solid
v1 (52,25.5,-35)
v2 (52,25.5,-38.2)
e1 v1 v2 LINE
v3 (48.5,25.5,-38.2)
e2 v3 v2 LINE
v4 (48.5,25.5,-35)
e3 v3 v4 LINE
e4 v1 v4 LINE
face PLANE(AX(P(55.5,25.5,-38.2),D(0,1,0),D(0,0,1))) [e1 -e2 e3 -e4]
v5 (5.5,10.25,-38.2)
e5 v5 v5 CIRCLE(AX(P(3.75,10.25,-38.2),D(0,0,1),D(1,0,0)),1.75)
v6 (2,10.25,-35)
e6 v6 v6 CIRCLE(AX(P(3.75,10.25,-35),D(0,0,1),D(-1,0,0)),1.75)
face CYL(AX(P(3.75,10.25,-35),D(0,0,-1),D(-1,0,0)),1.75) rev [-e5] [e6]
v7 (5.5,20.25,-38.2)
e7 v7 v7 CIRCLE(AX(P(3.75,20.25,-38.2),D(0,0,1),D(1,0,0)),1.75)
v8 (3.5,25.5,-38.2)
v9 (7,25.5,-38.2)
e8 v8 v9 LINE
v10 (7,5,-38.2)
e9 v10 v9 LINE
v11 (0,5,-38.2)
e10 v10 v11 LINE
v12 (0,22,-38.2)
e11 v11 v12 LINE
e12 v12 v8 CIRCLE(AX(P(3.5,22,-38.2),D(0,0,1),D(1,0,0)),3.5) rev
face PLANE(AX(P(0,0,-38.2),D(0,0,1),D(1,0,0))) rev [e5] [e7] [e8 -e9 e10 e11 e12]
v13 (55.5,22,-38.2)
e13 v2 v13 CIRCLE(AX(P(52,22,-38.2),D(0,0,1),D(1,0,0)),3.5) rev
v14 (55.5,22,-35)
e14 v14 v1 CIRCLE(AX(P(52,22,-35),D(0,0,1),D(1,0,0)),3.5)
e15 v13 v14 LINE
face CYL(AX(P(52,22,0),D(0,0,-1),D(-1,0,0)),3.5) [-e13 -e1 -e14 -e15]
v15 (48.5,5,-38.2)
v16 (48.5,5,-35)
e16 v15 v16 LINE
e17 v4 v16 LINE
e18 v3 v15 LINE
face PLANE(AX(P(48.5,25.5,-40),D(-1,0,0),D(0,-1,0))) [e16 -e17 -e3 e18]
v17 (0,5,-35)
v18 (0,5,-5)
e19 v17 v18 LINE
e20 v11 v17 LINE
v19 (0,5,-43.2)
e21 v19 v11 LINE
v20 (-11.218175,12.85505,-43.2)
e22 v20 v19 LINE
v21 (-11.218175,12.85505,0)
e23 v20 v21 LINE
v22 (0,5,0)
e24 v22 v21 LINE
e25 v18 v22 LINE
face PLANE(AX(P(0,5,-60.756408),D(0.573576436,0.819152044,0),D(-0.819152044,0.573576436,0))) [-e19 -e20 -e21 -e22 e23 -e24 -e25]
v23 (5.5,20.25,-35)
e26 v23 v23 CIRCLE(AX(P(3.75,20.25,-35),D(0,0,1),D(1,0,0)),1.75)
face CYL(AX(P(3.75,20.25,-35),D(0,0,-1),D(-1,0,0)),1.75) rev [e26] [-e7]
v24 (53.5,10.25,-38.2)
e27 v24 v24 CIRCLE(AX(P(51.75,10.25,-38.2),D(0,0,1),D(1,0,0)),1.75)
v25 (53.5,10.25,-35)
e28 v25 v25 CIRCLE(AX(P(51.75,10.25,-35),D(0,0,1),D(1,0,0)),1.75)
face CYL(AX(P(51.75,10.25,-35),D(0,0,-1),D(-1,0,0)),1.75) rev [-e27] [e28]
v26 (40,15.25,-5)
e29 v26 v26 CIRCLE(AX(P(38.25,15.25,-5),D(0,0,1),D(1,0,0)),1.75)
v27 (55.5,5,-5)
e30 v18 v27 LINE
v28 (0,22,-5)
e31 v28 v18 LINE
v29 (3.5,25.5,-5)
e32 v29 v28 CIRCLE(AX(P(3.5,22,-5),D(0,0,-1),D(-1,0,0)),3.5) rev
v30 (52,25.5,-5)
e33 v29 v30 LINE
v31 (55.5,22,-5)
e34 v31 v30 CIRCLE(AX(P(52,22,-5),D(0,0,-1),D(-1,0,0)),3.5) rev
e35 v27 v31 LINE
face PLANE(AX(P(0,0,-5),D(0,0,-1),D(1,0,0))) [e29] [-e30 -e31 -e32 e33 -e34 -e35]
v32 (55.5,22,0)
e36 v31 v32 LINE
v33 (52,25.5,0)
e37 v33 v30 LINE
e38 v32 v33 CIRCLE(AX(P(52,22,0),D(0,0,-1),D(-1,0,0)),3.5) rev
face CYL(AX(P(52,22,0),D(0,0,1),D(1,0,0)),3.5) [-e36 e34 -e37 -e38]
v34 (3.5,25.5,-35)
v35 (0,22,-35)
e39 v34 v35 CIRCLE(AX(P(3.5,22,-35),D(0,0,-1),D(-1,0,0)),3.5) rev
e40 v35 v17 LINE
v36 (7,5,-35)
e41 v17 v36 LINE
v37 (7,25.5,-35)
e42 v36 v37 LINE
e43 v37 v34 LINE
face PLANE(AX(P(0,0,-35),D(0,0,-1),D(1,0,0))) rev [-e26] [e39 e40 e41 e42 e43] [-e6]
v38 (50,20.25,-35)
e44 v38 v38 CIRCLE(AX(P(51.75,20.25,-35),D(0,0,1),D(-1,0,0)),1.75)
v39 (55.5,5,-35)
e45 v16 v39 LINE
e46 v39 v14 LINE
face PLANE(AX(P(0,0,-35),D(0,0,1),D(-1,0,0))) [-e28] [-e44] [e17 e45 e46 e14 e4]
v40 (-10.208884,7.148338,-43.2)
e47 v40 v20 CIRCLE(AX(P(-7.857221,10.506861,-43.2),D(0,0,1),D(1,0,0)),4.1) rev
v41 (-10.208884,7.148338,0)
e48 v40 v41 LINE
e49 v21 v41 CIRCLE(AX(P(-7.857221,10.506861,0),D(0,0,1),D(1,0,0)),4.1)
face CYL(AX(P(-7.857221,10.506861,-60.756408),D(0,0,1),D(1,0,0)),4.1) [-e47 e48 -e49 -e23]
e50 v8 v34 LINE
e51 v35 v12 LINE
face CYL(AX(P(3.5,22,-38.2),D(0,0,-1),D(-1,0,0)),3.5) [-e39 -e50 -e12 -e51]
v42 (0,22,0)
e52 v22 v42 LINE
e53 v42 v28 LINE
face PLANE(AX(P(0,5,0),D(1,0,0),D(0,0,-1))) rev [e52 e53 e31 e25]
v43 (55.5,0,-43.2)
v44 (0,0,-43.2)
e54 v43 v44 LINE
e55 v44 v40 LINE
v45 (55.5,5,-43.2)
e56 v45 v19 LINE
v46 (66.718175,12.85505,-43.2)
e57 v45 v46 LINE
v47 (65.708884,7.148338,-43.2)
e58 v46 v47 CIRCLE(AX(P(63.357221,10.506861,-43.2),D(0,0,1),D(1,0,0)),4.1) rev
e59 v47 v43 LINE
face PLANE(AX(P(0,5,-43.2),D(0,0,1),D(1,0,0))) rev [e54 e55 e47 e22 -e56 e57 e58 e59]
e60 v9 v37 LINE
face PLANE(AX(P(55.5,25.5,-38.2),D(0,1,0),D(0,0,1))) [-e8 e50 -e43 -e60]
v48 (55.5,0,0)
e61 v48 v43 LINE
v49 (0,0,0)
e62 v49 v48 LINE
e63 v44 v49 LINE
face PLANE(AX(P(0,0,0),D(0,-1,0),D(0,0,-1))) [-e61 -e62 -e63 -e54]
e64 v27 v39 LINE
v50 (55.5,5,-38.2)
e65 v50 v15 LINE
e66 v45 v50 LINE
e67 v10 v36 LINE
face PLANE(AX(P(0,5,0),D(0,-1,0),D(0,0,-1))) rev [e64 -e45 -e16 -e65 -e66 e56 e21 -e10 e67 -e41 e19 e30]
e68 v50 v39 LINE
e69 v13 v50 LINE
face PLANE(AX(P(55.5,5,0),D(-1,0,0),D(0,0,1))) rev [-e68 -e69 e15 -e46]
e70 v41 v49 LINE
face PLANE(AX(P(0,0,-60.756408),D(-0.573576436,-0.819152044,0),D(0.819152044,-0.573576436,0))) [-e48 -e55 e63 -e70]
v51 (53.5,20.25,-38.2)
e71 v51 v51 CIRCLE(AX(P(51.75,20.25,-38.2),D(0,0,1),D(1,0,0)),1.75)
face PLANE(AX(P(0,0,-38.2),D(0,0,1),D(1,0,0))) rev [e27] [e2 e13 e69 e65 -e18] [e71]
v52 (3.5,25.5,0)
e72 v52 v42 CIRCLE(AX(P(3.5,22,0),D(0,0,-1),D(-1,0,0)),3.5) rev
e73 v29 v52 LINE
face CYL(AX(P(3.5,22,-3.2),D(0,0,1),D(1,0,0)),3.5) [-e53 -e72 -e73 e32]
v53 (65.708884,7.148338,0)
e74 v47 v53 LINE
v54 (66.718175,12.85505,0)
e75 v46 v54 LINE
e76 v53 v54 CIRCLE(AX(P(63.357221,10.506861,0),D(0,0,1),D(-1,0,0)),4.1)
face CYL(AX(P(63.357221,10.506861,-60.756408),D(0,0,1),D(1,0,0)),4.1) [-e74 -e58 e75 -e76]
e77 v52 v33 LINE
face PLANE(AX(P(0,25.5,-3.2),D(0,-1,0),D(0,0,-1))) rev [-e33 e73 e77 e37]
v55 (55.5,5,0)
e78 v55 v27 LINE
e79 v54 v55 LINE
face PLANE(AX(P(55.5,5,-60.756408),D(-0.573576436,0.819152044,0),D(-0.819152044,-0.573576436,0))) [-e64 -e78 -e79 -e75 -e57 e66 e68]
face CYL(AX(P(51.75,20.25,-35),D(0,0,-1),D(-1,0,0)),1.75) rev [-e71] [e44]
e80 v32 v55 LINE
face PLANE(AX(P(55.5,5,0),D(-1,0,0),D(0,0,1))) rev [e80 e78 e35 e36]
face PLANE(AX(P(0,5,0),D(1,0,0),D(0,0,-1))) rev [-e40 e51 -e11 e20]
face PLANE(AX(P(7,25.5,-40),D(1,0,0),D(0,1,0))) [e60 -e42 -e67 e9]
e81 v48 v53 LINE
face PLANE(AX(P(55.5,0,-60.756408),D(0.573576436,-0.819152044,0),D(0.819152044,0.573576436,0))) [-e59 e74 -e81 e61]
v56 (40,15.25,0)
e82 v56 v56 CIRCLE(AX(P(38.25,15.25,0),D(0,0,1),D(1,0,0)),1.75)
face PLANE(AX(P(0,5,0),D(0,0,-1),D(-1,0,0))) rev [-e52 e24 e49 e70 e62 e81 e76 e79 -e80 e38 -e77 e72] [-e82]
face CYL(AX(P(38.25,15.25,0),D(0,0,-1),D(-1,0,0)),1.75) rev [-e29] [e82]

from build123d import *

# Parameters (mm, degrees)
SKETCH1_W            = 55.5
SKETCH1_H            = 43.2
BASE_DEPTH           = 5
SKETCH2_W            = 55.5
SKETCH2_H            = 25.5
WALL_DEPTH           = 5
SKETCH3_W            = 7
SKETCH3_H            = 20.5
MOUNTINGTABS_DEPTH   = 5
LIPS_REACH           = 76.811
SKETCH5_R            = 1.75
MOUNTINGHOLES_DEPTH  = 5
FILLETS_R            = 3.5
SKETCH6_R            = 1.75
THROUGHHOLE_DEPTH    = 5
MIRROR1_START        = -40
MIRROR1_OUTLINE_R    = 1.75
MIRROR1_DEPTH        = 1.8
MIRROR1_START_2      = -38.2
MIRROR1_2_OUTLINE_R  = 1.75
MIRROR1_2_DEPTH      = 3.2
FILLETS_OF_MIRROR2_R = 3.5
CUT_EXTRUDE2_DEPTH   = 5
CUT_EXTRUDE3_DEPTH   = 3.2


# Read off the part's stored shape, not the designer's step: Mirror1
with BuildPart() as part:
    # Sketch1 → base (new body)
    with BuildSketch(Plane(origin=(0, 0, 0), x_dir=(1, 0, 0), z_dir=(0, 1, 0))):
        with Locations((27.75, 21.6)):
            Rectangle(SKETCH1_W, SKETCH1_H)
    extrude(amount=BASE_DEPTH)

    # Sketch2 → wall (add)
    with BuildSketch(Plane(origin=(0, 0, -43.2), x_dir=(-1, 0, 0), z_dir=(0, 0, -1))):
        with Locations((-27.75, 12.75)):
            Rectangle(SKETCH2_W, SKETCH2_H)
    wall = extrude(amount=-WALL_DEPTH)

    # Sketch3 → mountingTabs (add)
    with BuildSketch(Plane.XY.offset(-8.2)):
        with Locations((3.5, 15.25)):
            Rectangle(SKETCH3_W, SKETCH3_H)
        with Locations((52, 15.25)):
            Rectangle(SKETCH3_W, SKETCH3_H)
    extrude(amount=MOUNTINGTABS_DEPTH)

    # lips: up to this face of the body (flat: up to its plane)
    lips_end = Plane(part.part.faces().sort_by_distance((27.75, 12.75, -43.2))[0])
    # Sketch4 → lips (add, up to the picked face)
    with BuildSketch(Plane.XY, mode=Mode.PRIVATE) as lips_sk1:
        with BuildLine():
            Line((0, 0), (-10.208884478, 7.148337868))
            ThreePointArc((-10.208884478, 7.148337868), (-11.894564223, 9.792816133), (-11.218174515, 12.85505036))
            Line((-11.218174515, 12.85505036), (0, 5))
            Line((0, 5), (0, 0))
        make_face()
    lips_tool1 = split(extrude(lips_sk1.sketch, amount=-LIPS_REACH, mode=Mode.PRIVATE), bisect_by=lips_end, keep=Keep.BOTH, mode=Mode.PRIVATE)
    # Sketch4 → lips (add, up to the picked face)
    with BuildSketch(Plane.XY, mode=Mode.PRIVATE) as lips_sk2:
        with BuildLine():
            Line((55.5, 5), (66.718174515, 12.85505036))
            ThreePointArc((66.718174515, 12.85505036), (67.394564223, 9.792816133), (65.708884478, 7.148337868))
            Line((65.708884478, 7.148337868), (55.5, 0))
            Line((55.5, 0), (55.5, 5))
        make_face()
    lips_tool2 = split(extrude(lips_sk2.sketch, amount=-LIPS_REACH, mode=Mode.PRIVATE), bisect_by=lips_end, keep=Keep.BOTH, mode=Mode.PRIVATE)
    add(lips_tool1.solids().sort_by(Axis((-5.839287, 6.590277, 0), (0, 0, -1)))[0])
    add(lips_tool2.solids().sort_by(Axis((61.339287, 6.590277, 0), (0, 0, -1)))[0])

    # Sketch5 → mountingHoles (cut)
    with BuildSketch(Plane.XY.offset(-3.2)):
        with Locations((3.75, 20.25)):
            Circle(SKETCH5_R)
        with Locations(Location((3.75, 10.25, 0), (0, 0, 180))):
            Circle(SKETCH5_R)
        with Locations((51.75, 10.25)):
            Circle(SKETCH5_R)
        with Locations(Location((51.75, 20.25, 0), (0, 0, 180))):
            Circle(SKETCH5_R)
    extrude(amount=-MOUNTINGHOLES_DEPTH, mode=Mode.SUBTRACT)

    # fillets
    fillets_edges = [part.edges().sort_by_distance(p)[0] for p in [
        (0, 25.5, -40.7),
        (55.5, 25.5, -40.7),
        (0, 25.5, -5.7),
        (55.5, 25.5, -5.7),
    ]]
    fillet(fillets_edges, radius=FILLETS_R)

    # Sketch6 → throughHole (cut)
    with BuildSketch(Plane.XY.offset(-38.2)):
        with Locations((38.25, 15.25)):
            Circle(SKETCH6_R)
    throughhole = extrude(amount=-THROUGHHOLE_DEPTH, mode=Mode.SUBTRACT)

    # Mirror1 outline → Mirror1 (cut)
    with BuildSketch(Plane.XY.offset(MIRROR1_START)):
        with Locations((51.75, 10.25)):
            Circle(MIRROR1_OUTLINE_R)
        with Locations((51.75, 20.25)):
            Circle(MIRROR1_OUTLINE_R)
        with Locations((3.75, 20.25)):
            Circle(MIRROR1_OUTLINE_R)
        with Locations((3.75, 10.25)):
            Circle(MIRROR1_OUTLINE_R)
    extrude(amount=MIRROR1_DEPTH, mode=Mode.SUBTRACT)

    # Mirror1 2 outline → Mirror1 2 (add)
    # profile 1 of 2: a face of its own
    with BuildSketch(Plane.XY.offset(MIRROR1_START_2)):
        with BuildLine():
            ThreePointArc((55.5, 22), (54.474873734, 24.474873734), (52, 25.5))
            Line((52, 25.5), (48.5, 25.5))
            Line((48.5, 25.5), (48.5, 5))
            Line((48.5, 5), (55.5, 5))
            Line((55.5, 5), (55.5, 22))
        make_face()
        with Locations((51.75, 10.25)):
            Circle(MIRROR1_2_OUTLINE_R, mode=Mode.SUBTRACT)
        with Locations((51.75, 20.25)):
            Circle(MIRROR1_2_OUTLINE_R, mode=Mode.SUBTRACT)
    # profile 2 of 2: a face of its own
    with BuildSketch(Plane.XY.offset(MIRROR1_START_2)):
        with BuildLine():
            Line((7, 5), (7, 25.5))
            Line((7, 25.5), (3.5, 25.5))
            ThreePointArc((3.5, 25.5), (1.025126266, 24.474873734), (0, 22))
            Line((0, 22), (0, 5))
            Line((0, 5), (7, 5))
        make_face()
        with Locations((3.75, 10.25)):
            Circle(MIRROR1_2_OUTLINE_R, mode=Mode.SUBTRACT)
        with Locations((3.75, 20.25)):
            Circle(MIRROR1_2_OUTLINE_R, mode=Mode.SUBTRACT)
    extrude(amount=MIRROR1_2_DEPTH)

    # Mirror2: wall, throughHole across plane
    add(wall.mirror(Plane(origin=(0, 0, -21.6), x_dir=(1, 0, 0), z_dir=(0, 0, -1))))
    add(throughhole.mirror(Plane(origin=(0, 0, -21.6), x_dir=(1, 0, 0), z_dir=(0, 0, -1))), mode=Mode.SUBTRACT)

    # fillets of Mirror2
    fillets_of_mirror2_edges = [part.edges().sort_by_distance(p)[0] for p in [
        (0, 25.5, -2.5),
        (55.5, 25.5, -2.5),
        (0, 25.5, -37.5),
        (55.5, 25.5, -37.5),
    ]]
    fillet(fillets_of_mirror2_edges, radius=FILLETS_OF_MIRROR2_R)

    # Sketch7 → Cut-Extrude2 (cut)
    with BuildSketch(Plane(origin=(0, 0, -43.2), x_dir=(-1, 0, 0), z_dir=(0, 0, -1))):
        with BuildLine():
            Line((-55.5, 5), (0, 5))
            Line((0, 5), (0, 22))
            ThreePointArc((0, 22), (-1.025126266, 24.474873734), (-3.5, 25.5))
            Line((-3.5, 25.5), (-52, 25.5))
            ThreePointArc((-52, 25.5), (-54.474873734, 24.474873734), (-55.5, 22))
            Line((-55.5, 22), (-55.5, 5))
        make_face()
    extrude(amount=-CUT_EXTRUDE2_DEPTH, mode=Mode.SUBTRACT)

    # Sketch8 → Cut-Extrude3 (cut)
    with BuildSketch(Plane(origin=(0, 0, -8.2), x_dir=(-1, 0, 0), z_dir=(0, 0, -1))):
        with BuildLine():
            Line((-48.5, 25.5), (-52, 25.5))
            ThreePointArc((-52, 25.5), (-54.474873734, 24.474873734), (-55.5, 22))
            Line((-55.5, 22), (-55.5, 5))
            Line((-55.5, 5), (-48.5, 5))
            Line((-48.5, 5), (-48.5, 25.5))
        make_face()
        with BuildLine():
            Line((0, 5), (0, 22))
            ThreePointArc((0, 22), (-1.025126266, 24.474873734), (-3.5, 25.5))
            Line((-3.5, 25.5), (-7, 25.5))
            Line((-7, 25.5), (-7, 5))
            Line((-7, 5), (0, 5))
        make_face()
    extrude(amount=-CUT_EXTRUDE3_DEPTH, mode=Mode.SUBTRACT)


solid = part.part
